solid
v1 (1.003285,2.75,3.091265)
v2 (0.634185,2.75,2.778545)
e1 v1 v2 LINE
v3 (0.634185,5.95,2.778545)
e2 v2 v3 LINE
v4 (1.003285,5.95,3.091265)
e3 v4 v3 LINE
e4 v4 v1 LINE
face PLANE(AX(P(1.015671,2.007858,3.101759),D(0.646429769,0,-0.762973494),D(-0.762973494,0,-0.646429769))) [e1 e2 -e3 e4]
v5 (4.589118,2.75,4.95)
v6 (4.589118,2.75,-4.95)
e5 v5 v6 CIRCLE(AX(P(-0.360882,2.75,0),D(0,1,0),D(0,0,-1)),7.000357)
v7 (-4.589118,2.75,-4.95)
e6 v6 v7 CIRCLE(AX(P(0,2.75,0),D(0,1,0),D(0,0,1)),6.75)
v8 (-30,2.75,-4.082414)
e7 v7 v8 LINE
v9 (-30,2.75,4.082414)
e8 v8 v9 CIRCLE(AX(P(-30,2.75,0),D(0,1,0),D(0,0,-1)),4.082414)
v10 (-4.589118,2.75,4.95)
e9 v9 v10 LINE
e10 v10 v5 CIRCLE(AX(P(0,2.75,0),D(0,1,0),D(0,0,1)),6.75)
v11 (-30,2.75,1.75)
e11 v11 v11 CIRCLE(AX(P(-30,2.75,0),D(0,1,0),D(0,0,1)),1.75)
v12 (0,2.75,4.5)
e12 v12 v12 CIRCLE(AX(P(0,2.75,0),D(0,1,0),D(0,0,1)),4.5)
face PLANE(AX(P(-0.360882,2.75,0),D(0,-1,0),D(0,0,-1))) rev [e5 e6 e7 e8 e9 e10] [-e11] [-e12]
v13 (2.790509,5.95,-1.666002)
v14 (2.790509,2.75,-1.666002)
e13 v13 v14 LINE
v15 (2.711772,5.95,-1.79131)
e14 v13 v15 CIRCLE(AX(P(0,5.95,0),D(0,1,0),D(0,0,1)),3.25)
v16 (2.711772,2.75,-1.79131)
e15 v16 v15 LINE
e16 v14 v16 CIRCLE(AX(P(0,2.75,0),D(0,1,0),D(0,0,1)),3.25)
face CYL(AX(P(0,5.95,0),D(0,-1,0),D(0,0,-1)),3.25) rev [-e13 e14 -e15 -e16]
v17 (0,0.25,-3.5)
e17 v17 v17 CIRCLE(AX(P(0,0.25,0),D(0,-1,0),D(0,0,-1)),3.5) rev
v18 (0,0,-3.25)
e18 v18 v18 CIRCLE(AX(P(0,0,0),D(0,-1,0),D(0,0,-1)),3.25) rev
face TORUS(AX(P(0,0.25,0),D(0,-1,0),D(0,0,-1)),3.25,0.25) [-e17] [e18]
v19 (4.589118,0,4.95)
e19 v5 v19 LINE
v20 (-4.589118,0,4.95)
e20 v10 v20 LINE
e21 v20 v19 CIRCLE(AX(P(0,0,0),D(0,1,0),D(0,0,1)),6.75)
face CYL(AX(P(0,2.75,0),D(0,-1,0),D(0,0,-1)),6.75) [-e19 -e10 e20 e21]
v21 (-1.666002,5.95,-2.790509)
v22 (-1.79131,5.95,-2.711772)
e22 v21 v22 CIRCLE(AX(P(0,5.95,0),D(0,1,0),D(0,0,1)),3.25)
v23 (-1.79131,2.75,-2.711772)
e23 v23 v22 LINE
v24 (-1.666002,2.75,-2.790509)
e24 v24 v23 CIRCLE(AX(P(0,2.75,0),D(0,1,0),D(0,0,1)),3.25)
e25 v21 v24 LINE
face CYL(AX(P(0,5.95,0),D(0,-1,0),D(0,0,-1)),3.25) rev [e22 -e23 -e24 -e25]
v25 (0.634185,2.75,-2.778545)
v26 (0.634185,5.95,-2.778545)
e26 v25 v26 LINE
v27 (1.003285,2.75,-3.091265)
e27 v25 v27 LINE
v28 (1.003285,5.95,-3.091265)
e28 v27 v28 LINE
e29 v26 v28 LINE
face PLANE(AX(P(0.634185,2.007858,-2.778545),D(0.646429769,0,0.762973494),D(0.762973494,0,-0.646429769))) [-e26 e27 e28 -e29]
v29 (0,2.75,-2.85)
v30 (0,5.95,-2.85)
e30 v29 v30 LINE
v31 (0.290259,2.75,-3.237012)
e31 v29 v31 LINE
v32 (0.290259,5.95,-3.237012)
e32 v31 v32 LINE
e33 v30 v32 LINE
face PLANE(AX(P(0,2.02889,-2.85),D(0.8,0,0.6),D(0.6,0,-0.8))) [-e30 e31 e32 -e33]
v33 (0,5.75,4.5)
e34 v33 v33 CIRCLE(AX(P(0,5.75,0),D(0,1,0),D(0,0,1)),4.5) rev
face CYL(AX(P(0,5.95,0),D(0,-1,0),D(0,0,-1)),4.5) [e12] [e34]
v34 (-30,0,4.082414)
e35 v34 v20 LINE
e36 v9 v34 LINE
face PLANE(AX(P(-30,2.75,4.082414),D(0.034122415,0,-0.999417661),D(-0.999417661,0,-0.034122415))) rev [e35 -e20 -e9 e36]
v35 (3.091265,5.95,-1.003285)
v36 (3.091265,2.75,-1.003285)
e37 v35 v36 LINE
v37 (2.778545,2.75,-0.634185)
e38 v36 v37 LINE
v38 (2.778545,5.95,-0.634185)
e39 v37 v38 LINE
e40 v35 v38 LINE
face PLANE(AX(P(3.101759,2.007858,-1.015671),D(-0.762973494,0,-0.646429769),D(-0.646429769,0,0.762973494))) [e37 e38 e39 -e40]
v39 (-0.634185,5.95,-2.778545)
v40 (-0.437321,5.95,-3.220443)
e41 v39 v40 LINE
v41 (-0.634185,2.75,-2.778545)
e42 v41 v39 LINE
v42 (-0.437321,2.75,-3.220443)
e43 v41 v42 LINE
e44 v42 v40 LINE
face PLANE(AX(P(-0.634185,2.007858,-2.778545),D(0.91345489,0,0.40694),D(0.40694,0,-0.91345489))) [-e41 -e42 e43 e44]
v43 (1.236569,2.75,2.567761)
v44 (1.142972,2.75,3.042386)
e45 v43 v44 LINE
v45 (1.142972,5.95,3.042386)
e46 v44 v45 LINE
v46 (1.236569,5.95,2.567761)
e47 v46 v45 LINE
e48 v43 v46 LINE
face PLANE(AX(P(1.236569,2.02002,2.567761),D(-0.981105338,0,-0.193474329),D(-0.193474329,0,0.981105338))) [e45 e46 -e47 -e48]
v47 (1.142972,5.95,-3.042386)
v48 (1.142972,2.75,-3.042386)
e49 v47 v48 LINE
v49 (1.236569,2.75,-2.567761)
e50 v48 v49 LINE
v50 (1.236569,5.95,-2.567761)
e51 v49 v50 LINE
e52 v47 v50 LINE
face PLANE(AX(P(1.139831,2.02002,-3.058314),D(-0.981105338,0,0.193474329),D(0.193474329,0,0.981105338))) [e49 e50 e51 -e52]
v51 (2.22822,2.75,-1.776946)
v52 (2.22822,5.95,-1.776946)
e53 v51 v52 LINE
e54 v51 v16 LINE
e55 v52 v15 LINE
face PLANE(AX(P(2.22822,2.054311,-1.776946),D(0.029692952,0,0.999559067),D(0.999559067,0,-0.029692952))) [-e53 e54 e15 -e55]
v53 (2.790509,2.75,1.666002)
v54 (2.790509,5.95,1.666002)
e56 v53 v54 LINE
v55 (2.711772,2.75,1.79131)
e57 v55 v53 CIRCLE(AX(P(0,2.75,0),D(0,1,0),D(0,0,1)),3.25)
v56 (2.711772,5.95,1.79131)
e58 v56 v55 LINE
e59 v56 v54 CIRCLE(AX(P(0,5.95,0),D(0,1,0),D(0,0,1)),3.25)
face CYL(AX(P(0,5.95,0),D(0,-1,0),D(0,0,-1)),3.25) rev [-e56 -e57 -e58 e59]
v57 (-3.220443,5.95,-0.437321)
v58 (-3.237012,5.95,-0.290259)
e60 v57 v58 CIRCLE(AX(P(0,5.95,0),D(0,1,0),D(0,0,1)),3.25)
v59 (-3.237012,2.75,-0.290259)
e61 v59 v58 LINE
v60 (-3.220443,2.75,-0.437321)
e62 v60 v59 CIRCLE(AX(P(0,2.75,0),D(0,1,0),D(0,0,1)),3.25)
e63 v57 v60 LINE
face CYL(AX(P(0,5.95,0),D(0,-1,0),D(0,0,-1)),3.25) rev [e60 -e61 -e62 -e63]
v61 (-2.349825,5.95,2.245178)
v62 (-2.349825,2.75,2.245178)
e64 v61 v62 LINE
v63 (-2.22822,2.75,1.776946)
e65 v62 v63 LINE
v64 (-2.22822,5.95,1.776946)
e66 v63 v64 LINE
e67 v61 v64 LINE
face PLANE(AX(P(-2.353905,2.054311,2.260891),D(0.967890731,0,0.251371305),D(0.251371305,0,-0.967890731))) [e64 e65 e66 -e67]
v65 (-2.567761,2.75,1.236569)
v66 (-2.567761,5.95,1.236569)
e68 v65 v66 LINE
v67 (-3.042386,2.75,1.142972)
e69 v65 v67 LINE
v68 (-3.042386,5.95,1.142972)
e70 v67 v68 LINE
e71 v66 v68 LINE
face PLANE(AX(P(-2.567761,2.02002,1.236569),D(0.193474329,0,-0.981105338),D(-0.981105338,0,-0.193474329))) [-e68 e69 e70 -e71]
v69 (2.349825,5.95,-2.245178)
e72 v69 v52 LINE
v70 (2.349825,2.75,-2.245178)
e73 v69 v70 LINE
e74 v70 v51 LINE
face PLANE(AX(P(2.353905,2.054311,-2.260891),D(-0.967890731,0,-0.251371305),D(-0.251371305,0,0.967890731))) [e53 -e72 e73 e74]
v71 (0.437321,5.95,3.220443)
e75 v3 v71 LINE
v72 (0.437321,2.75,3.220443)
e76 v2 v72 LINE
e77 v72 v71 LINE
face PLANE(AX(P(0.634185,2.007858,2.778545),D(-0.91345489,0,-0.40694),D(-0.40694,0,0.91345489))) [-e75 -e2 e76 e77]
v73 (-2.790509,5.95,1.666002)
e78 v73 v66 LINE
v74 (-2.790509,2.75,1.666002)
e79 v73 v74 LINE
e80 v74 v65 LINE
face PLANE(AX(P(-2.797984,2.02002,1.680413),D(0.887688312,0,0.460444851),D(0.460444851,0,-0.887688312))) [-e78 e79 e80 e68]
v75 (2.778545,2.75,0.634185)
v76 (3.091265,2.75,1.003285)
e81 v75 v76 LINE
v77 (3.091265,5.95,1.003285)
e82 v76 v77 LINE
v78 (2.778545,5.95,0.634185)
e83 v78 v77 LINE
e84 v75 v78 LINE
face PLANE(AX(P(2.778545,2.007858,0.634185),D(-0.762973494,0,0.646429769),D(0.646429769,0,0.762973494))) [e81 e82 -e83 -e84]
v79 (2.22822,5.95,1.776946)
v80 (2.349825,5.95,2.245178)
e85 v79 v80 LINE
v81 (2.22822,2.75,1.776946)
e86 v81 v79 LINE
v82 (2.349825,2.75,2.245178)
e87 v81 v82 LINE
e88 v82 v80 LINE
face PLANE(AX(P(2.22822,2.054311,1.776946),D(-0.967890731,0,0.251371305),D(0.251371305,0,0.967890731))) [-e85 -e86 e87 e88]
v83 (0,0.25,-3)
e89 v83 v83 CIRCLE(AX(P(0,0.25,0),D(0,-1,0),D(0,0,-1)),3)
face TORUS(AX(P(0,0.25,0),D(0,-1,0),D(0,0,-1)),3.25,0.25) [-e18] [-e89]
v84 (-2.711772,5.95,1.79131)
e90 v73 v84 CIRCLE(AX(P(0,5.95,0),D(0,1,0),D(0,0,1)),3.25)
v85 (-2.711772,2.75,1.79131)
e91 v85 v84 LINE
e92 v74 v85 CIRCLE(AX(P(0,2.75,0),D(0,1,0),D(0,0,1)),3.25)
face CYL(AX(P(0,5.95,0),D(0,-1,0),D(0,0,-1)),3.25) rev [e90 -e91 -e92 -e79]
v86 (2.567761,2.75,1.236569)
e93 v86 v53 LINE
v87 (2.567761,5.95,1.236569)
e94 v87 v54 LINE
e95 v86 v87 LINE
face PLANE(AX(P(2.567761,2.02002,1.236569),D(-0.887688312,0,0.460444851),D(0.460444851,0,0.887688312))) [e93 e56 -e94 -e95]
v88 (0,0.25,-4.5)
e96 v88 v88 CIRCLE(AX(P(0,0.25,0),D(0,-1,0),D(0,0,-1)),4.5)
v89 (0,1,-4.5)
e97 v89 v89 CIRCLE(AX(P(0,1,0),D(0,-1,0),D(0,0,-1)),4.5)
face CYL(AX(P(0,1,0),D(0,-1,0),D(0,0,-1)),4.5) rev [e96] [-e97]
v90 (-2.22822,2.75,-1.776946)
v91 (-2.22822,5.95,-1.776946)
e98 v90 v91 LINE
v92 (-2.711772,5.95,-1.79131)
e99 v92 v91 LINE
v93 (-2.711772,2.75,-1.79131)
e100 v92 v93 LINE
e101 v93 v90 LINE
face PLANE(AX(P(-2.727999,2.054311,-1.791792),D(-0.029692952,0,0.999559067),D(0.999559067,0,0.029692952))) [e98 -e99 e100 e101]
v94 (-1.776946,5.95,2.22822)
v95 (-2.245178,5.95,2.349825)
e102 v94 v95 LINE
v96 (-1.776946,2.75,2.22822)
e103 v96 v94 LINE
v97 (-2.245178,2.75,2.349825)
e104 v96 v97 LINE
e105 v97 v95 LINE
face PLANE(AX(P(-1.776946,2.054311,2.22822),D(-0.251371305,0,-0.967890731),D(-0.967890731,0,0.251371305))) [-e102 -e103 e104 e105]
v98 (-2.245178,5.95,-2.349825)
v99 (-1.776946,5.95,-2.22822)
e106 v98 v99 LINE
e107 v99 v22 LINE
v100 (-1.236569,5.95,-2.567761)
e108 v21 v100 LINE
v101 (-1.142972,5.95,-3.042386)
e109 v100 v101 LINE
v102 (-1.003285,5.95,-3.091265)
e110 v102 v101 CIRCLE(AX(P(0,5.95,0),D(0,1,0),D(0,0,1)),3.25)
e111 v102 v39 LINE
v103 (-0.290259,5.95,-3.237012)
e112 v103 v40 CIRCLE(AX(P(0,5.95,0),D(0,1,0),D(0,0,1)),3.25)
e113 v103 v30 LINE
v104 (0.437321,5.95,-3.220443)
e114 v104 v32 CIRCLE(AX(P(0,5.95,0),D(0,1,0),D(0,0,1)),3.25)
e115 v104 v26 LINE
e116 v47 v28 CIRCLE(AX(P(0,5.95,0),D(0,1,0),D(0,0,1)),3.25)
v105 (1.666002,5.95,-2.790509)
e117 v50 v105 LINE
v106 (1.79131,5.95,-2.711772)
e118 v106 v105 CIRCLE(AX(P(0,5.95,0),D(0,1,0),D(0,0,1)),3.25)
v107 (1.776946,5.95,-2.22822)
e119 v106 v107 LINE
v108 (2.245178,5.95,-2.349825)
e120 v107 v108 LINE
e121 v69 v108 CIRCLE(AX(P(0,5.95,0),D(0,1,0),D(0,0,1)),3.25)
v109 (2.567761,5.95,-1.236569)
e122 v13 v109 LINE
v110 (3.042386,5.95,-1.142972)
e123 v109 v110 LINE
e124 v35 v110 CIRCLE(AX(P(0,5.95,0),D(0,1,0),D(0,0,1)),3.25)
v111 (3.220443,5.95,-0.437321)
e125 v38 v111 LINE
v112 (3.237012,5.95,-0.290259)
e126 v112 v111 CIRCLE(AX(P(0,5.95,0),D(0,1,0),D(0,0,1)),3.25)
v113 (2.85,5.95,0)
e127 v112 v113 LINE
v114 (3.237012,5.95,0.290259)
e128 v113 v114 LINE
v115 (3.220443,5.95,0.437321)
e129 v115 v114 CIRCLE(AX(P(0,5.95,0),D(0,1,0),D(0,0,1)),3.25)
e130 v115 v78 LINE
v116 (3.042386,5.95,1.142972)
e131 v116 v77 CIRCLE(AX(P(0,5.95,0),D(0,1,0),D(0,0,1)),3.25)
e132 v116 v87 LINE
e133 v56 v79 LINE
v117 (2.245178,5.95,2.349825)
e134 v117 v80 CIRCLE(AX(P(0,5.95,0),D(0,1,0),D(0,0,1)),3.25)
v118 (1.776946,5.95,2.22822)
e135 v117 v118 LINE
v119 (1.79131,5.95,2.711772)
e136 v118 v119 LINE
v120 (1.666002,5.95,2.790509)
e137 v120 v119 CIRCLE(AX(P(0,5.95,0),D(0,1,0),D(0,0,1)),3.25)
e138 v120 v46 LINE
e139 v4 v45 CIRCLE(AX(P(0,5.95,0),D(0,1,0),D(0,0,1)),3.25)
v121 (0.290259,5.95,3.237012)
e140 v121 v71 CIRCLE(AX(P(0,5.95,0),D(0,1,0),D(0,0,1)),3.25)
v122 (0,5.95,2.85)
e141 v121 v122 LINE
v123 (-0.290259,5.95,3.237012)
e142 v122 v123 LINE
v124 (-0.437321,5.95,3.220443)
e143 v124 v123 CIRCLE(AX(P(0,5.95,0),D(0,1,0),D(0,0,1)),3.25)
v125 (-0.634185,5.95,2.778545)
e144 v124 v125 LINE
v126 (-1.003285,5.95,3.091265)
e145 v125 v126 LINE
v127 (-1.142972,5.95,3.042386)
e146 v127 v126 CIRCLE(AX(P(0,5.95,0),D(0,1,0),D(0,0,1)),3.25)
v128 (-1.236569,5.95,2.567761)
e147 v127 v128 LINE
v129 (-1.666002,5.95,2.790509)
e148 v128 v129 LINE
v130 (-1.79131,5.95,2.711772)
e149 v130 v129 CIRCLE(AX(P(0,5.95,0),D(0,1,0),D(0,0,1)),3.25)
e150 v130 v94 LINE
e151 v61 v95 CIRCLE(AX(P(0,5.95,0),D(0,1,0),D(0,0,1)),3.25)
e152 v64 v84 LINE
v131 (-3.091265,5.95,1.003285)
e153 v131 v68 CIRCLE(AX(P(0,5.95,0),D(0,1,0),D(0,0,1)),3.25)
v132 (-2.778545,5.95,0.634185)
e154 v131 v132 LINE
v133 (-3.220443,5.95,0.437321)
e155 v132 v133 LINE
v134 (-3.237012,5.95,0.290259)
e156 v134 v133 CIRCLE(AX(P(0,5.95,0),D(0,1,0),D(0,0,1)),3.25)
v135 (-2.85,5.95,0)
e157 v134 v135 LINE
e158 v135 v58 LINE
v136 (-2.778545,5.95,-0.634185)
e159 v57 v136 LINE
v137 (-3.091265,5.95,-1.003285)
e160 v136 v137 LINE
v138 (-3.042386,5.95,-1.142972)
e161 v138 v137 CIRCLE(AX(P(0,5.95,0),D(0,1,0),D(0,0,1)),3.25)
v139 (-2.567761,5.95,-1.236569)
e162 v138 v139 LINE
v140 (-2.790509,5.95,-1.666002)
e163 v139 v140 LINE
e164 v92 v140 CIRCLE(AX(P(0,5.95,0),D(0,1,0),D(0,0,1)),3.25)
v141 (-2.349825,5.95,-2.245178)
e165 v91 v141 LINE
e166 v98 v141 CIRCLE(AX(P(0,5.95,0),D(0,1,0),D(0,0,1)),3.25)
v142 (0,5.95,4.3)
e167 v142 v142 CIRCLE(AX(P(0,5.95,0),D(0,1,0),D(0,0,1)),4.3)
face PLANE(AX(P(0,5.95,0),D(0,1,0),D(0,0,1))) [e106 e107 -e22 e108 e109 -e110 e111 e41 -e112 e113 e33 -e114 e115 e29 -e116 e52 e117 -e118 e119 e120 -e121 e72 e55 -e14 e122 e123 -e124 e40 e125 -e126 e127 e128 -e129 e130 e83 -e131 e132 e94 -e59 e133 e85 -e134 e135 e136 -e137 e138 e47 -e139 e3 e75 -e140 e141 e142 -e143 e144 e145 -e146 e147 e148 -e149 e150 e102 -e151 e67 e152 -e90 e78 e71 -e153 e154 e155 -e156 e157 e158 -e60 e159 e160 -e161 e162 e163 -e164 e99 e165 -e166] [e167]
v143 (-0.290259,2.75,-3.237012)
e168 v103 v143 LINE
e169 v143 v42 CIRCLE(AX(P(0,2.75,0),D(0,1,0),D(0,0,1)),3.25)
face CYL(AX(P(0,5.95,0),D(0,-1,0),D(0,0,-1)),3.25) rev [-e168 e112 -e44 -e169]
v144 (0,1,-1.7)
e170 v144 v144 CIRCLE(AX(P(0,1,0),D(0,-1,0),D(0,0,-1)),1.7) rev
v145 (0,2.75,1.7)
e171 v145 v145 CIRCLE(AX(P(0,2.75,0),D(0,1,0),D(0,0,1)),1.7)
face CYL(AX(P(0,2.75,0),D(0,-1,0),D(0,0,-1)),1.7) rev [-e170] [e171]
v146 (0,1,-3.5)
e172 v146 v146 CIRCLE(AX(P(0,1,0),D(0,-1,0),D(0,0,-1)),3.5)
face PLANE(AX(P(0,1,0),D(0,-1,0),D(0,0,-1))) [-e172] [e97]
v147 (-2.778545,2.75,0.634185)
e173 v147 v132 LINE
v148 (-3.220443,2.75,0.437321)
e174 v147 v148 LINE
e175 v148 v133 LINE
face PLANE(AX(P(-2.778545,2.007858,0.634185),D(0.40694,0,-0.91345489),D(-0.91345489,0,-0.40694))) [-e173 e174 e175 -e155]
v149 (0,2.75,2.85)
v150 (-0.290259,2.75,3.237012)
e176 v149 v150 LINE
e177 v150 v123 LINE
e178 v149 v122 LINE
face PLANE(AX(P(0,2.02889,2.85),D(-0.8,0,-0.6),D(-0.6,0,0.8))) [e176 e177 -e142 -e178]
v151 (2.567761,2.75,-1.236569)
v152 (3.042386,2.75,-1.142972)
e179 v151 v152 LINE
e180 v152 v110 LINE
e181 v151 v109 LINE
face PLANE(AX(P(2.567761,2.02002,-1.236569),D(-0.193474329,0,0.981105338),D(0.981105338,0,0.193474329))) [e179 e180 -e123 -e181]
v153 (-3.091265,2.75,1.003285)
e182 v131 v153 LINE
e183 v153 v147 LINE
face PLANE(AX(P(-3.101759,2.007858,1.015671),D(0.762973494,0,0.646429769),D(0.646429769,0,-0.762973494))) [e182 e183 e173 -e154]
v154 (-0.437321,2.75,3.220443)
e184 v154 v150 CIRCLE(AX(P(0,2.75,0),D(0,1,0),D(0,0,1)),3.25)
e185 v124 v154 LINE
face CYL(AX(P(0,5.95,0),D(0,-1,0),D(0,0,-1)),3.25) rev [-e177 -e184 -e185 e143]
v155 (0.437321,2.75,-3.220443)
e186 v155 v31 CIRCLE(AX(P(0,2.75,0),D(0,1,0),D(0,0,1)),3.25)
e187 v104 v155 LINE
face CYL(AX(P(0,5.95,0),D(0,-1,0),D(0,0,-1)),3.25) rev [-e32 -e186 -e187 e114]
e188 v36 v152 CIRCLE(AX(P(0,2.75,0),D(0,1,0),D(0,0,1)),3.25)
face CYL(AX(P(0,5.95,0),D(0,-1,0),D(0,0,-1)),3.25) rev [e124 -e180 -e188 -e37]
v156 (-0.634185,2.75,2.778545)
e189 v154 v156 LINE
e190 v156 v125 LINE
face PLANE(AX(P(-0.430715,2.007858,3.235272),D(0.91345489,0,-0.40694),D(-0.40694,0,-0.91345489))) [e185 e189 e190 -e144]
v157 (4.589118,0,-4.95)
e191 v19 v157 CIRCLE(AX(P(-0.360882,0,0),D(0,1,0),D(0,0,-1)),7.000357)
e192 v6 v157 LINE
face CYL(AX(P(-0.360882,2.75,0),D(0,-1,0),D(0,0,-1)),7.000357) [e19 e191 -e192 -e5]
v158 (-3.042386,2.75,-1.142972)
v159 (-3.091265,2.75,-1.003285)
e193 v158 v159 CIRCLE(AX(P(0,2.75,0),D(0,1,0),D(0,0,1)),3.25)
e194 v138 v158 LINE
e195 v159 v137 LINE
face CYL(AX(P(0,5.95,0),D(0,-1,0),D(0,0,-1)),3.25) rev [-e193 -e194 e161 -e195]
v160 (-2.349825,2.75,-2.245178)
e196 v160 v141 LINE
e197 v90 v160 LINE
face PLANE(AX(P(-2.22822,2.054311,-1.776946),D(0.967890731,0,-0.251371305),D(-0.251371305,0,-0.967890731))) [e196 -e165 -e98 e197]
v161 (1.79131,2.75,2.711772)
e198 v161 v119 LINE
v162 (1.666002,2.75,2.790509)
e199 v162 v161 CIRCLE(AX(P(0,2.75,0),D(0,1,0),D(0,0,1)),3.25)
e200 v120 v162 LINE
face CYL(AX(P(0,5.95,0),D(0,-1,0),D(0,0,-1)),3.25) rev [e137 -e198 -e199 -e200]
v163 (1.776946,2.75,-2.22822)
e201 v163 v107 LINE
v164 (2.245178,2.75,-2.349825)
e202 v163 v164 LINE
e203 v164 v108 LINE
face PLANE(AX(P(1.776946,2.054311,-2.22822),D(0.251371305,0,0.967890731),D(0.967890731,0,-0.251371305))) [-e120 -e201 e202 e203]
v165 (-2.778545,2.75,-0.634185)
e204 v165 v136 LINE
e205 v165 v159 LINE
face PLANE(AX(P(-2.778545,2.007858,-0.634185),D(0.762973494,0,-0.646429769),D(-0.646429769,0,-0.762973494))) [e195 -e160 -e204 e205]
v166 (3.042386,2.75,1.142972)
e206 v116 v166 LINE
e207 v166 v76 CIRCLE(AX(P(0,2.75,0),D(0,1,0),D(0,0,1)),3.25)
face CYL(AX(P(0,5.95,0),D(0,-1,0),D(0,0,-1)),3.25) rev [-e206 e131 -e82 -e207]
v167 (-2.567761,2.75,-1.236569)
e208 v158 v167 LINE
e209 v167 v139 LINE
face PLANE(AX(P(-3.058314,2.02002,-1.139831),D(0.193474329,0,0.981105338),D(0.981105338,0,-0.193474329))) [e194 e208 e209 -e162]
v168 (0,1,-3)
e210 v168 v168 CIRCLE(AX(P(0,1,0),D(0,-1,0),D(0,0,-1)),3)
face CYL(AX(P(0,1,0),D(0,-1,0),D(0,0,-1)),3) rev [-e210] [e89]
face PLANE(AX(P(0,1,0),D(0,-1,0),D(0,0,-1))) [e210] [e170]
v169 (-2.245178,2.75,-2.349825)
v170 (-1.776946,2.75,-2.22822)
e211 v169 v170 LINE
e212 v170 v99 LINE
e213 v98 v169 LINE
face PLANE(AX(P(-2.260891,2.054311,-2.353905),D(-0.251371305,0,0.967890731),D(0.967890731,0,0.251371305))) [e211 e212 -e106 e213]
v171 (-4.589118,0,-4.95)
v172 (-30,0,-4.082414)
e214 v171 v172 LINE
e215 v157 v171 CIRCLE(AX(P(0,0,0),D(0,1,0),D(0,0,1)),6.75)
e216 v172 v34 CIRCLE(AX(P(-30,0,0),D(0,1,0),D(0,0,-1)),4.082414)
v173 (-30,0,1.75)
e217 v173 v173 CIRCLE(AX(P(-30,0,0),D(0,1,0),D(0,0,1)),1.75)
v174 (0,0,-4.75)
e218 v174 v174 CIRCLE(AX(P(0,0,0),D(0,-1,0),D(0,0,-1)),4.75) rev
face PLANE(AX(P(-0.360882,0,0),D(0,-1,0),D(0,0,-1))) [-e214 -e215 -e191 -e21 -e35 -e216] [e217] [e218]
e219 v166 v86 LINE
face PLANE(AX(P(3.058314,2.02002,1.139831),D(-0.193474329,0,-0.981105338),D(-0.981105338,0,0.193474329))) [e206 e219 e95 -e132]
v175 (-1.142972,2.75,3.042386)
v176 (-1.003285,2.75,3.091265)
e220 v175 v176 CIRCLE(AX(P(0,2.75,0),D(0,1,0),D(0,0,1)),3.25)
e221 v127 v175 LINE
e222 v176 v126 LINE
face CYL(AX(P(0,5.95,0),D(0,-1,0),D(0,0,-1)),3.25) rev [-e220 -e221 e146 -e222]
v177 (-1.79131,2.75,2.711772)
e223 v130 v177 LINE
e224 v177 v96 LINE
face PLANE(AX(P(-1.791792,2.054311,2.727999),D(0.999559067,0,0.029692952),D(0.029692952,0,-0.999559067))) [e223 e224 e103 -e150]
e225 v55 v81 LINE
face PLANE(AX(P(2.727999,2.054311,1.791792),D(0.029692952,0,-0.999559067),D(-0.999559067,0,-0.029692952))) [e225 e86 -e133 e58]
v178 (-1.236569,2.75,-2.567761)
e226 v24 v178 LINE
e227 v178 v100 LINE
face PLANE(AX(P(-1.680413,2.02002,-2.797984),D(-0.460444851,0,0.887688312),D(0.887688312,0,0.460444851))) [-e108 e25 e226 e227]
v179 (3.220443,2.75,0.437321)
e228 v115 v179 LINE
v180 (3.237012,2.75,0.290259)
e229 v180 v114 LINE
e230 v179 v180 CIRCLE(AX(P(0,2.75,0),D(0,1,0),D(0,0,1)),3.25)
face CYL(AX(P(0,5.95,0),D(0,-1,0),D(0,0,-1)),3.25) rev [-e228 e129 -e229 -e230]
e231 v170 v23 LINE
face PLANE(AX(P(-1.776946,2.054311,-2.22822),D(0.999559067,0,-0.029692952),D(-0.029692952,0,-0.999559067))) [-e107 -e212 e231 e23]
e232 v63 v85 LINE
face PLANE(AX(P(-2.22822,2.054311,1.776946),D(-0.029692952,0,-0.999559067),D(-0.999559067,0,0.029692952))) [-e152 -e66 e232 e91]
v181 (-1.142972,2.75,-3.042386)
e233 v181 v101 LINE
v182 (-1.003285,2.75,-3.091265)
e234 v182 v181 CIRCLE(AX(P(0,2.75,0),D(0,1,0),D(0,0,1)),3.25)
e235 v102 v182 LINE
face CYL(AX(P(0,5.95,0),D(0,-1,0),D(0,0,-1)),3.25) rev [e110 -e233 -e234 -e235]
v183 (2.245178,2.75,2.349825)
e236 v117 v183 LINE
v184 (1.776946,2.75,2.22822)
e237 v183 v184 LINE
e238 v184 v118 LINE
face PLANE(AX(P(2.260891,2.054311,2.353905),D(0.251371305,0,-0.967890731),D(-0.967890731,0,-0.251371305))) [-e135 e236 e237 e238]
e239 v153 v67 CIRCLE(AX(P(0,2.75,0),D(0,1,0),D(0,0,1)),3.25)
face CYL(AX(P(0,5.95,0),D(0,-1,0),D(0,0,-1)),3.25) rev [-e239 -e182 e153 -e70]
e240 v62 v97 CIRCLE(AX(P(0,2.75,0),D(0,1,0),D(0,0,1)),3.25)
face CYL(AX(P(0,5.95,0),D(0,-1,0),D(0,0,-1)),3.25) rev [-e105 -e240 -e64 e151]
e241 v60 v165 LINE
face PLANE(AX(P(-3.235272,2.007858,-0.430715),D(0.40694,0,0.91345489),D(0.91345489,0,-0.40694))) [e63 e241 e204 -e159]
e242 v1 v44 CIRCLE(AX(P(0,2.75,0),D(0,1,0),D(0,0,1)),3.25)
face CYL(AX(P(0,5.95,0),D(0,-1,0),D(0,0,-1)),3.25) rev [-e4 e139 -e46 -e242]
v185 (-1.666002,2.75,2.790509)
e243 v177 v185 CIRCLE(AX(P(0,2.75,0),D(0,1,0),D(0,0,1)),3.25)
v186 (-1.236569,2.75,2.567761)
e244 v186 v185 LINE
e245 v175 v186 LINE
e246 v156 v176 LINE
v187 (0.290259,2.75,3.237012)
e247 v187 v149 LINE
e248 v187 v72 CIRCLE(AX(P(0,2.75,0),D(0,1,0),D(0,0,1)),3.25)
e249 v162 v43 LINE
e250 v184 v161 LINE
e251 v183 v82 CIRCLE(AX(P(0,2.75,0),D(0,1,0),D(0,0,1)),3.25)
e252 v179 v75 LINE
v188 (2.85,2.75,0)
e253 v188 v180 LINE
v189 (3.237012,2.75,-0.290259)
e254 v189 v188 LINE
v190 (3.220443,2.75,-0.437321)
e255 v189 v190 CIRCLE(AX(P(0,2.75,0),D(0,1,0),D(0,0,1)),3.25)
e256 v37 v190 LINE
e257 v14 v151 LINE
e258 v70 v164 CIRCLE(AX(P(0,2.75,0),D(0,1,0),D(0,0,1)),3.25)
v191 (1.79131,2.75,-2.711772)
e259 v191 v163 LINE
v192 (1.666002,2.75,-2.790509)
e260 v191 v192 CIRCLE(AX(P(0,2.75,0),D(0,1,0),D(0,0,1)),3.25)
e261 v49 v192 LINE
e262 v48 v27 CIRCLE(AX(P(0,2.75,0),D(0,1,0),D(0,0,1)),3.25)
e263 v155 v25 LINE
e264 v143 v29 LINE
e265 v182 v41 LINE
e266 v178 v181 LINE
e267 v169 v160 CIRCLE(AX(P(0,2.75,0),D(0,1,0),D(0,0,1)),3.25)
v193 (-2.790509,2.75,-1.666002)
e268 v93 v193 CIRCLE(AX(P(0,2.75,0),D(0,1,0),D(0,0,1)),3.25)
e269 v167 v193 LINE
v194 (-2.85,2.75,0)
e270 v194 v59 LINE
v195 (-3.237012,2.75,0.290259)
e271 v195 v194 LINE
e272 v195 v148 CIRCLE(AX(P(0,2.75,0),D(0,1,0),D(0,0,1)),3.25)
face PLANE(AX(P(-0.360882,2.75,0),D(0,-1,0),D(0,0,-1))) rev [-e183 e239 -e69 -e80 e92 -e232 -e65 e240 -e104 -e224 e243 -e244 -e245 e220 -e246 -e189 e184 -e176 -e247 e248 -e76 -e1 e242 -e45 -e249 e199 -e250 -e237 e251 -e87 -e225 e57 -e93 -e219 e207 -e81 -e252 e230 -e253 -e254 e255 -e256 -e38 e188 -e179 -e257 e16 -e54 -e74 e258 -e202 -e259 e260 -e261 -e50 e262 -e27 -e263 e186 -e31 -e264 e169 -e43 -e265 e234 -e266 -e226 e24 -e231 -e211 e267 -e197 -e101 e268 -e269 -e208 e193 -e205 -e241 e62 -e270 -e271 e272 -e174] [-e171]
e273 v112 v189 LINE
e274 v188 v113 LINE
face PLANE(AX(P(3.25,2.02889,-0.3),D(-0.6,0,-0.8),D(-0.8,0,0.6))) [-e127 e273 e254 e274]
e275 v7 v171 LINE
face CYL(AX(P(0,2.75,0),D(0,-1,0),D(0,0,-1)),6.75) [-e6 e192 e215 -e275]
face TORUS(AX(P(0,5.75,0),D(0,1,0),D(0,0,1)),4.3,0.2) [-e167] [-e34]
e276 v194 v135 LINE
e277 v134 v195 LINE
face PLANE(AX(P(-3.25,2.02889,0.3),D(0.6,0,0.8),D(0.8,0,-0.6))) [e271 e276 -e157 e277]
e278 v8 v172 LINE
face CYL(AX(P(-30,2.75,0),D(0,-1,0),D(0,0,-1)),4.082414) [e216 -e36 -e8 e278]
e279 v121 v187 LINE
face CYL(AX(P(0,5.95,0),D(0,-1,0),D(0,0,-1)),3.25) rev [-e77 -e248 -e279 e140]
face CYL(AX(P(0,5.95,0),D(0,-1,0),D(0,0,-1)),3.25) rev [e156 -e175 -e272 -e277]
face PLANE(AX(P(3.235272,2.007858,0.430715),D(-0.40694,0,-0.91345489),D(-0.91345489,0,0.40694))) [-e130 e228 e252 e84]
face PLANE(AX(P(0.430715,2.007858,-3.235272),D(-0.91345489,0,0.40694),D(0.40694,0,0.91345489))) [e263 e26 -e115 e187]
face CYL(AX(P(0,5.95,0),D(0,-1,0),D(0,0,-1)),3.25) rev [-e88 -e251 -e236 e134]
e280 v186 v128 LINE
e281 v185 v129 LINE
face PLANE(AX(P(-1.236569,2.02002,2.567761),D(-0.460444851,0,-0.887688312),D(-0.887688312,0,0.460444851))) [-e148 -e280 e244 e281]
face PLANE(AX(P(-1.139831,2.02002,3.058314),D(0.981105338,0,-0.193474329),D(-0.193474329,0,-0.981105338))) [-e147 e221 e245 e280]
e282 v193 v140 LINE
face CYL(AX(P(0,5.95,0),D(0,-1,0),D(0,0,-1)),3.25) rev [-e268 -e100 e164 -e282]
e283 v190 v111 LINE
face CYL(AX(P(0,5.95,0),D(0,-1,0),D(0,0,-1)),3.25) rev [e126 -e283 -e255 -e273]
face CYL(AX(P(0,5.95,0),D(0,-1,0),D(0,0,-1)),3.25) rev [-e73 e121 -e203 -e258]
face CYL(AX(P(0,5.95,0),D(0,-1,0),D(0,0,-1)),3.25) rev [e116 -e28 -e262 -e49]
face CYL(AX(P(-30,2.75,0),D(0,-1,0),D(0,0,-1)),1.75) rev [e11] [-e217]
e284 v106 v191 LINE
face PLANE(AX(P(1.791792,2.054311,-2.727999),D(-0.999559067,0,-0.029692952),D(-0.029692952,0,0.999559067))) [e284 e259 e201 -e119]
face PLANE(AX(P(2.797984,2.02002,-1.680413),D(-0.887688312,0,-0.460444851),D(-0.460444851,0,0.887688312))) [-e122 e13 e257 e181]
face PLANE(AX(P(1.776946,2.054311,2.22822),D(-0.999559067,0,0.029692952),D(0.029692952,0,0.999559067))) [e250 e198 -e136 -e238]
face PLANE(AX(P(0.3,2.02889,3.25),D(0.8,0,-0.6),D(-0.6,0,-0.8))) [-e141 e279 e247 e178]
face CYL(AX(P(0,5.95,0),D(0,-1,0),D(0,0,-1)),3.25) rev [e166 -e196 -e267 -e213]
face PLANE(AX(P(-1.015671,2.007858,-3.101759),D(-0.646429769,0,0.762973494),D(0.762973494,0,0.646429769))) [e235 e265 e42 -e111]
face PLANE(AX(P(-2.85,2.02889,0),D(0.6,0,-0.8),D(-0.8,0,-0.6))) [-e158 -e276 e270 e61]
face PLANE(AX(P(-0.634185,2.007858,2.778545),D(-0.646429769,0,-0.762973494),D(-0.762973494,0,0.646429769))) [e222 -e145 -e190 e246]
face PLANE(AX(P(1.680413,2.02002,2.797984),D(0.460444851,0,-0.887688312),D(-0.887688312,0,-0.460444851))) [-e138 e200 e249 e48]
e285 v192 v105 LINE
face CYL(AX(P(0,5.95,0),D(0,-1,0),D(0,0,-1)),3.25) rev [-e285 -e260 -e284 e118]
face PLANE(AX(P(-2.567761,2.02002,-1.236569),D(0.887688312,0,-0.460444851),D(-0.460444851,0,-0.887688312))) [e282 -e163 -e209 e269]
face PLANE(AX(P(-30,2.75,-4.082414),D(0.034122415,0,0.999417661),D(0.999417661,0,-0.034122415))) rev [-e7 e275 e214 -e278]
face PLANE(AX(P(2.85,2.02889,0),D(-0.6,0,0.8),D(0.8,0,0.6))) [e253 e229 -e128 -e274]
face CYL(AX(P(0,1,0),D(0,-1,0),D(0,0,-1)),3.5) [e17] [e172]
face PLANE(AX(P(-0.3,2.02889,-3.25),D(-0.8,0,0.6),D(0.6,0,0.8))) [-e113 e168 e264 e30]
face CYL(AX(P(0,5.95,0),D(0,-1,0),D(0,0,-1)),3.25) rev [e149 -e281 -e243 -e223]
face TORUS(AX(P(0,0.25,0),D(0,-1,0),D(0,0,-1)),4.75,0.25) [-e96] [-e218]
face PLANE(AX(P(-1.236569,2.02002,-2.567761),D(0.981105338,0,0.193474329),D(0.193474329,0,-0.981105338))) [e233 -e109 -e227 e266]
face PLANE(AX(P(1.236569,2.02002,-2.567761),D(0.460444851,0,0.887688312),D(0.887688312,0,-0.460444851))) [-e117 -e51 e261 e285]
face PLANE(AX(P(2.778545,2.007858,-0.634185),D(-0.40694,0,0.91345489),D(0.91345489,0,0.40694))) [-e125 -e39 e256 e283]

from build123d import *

# Parameters (mm, degrees)
SKETCH1_R           = 1.7
SKETCH1_R_2         = 1.75
BOSS_EXTRUDE1_DEPTH = 2.75
SKETCH2_R           = 4.5
SKETCH2_R_2         = 3.25
BOSS_EXTRUDE2_DEPTH = 3.2
BOSS_EXTRUDE3_DEPTH = 3.2
CIRPATTERN1_COUNT   = 28
SKETCH4_R           = 4.5
SKETCH4_R_2         = 3.5
SKETCH4_R_3         = 3
SKETCH4_R_4         = 1.7
CUT_EXTRUDE1_DEPTH  = 1
FILLET1_R           = 0.25
FILLET2_R           = 0.2


with BuildPart() as part:
    # Sketch1 → Boss-Extrude1 (new body)
    with BuildSketch(Plane(origin=(0, 0, 0), x_dir=(1, 0, 0), z_dir=(0, 1, 0))):
        with BuildLine():
            Line((-30, 4.082414086), (-4.589117562, 4.95))
            ThreePointArc((-4.589117562, 4.95), (0, 6.75), (4.589117562, 4.95))
            ThreePointArc((4.589117562, 4.95), (6.639474696, 0), (4.589117562, -4.95))
            ThreePointArc((4.589117562, -4.95), (0, -6.75), (-4.589117562, -4.95))
            Line((-4.589117562, -4.95), (-30, -4.082414086))
            ThreePointArc((-30, -4.082414086), (-34.082414086, 0), (-30, 4.082414086))
        make_face()
        with Locations(Location((0, 0, 0), (0, 0, 270))):
            Circle(SKETCH1_R, mode=Mode.SUBTRACT)
        with Locations(Location((-30, 0, 0), (0, 0, 270))):
            Circle(SKETCH1_R_2, mode=Mode.SUBTRACT)
    extrude(amount=BOSS_EXTRUDE1_DEPTH)

    # Sketch2 → Boss-Extrude2 (add)
    with BuildSketch(Plane(origin=(0, 2.75, 0), x_dir=(1, 0, 0), z_dir=(0, 1, 0))):
        with Locations(Location((0, 0, 0), (0, 0, 270))):
            Circle(SKETCH2_R)
        with Locations(Location((0, 0, 0), (0, 0, 270))):
            Circle(SKETCH2_R_2, mode=Mode.SUBTRACT)
    extrude(amount=BOSS_EXTRUDE2_DEPTH)

    # Sketch3 → Boss-Extrude3 (add)
    with BuildSketch(Plane(origin=(0, 5.95, 0), x_dir=(1, 0, 0), z_dir=(0, 1, 0))):
        Polygon((-0.3, 3.25), (0.3, 3.25), (0, 2.85), align=None)
    boss_extrude3 = extrude(amount=-BOSS_EXTRUDE3_DEPTH)

    # CirPattern1: Boss-Extrude3 ×28 about axis
    cirpattern1_axis = Axis((0, 0, 0), (0, 1, 0))
    for i in range(1, CIRPATTERN1_COUNT):
        add(boss_extrude3.rotate(cirpattern1_axis, i * 360 / CIRPATTERN1_COUNT))

    # Sketch4 → Cut-Extrude1 (cut)
    # profile 1 of 2: a face of its own
    with BuildSketch(Plane.XZ):
        with Locations(Location((0, 0, 0), (0, 0, 90))):
            Circle(SKETCH4_R)
        with Locations(Location((0, 0, 0), (0, 0, 270))):
            Circle(SKETCH4_R_2, mode=Mode.SUBTRACT)
    # profile 2 of 2: a face of its own
    with BuildSketch(Plane.XZ):
        with Locations(Location((0, 0, 0), (0, 0, 270))):
            Circle(SKETCH4_R_3)
        with Locations(Location((0, 0, 0), (0, 0, 270))):
            Circle(SKETCH4_R_4, mode=Mode.SUBTRACT)
    extrude(amount=-CUT_EXTRUDE1_DEPTH, mode=Mode.SUBTRACT)

    # Fillet1
    fillet1_edges = [part.edges().sort_by_distance(p)[0] for p in [
        (0, 0, 3.5),
        (0, 0, -4.5),
        (0, 0, 3),
    ]]
    fillet(fillet1_edges, radius=FILLET1_R - 0.0001)  # a hair under: the kernel refuses the full size

    # Fillet2
    fillet2_edges = [part.edges().sort_by_distance(p)[0] for p in [
        (0, 5.95, -4.5),
    ]]
    fillet(fillet2_edges, radius=FILLET2_R)


solid = part.part
